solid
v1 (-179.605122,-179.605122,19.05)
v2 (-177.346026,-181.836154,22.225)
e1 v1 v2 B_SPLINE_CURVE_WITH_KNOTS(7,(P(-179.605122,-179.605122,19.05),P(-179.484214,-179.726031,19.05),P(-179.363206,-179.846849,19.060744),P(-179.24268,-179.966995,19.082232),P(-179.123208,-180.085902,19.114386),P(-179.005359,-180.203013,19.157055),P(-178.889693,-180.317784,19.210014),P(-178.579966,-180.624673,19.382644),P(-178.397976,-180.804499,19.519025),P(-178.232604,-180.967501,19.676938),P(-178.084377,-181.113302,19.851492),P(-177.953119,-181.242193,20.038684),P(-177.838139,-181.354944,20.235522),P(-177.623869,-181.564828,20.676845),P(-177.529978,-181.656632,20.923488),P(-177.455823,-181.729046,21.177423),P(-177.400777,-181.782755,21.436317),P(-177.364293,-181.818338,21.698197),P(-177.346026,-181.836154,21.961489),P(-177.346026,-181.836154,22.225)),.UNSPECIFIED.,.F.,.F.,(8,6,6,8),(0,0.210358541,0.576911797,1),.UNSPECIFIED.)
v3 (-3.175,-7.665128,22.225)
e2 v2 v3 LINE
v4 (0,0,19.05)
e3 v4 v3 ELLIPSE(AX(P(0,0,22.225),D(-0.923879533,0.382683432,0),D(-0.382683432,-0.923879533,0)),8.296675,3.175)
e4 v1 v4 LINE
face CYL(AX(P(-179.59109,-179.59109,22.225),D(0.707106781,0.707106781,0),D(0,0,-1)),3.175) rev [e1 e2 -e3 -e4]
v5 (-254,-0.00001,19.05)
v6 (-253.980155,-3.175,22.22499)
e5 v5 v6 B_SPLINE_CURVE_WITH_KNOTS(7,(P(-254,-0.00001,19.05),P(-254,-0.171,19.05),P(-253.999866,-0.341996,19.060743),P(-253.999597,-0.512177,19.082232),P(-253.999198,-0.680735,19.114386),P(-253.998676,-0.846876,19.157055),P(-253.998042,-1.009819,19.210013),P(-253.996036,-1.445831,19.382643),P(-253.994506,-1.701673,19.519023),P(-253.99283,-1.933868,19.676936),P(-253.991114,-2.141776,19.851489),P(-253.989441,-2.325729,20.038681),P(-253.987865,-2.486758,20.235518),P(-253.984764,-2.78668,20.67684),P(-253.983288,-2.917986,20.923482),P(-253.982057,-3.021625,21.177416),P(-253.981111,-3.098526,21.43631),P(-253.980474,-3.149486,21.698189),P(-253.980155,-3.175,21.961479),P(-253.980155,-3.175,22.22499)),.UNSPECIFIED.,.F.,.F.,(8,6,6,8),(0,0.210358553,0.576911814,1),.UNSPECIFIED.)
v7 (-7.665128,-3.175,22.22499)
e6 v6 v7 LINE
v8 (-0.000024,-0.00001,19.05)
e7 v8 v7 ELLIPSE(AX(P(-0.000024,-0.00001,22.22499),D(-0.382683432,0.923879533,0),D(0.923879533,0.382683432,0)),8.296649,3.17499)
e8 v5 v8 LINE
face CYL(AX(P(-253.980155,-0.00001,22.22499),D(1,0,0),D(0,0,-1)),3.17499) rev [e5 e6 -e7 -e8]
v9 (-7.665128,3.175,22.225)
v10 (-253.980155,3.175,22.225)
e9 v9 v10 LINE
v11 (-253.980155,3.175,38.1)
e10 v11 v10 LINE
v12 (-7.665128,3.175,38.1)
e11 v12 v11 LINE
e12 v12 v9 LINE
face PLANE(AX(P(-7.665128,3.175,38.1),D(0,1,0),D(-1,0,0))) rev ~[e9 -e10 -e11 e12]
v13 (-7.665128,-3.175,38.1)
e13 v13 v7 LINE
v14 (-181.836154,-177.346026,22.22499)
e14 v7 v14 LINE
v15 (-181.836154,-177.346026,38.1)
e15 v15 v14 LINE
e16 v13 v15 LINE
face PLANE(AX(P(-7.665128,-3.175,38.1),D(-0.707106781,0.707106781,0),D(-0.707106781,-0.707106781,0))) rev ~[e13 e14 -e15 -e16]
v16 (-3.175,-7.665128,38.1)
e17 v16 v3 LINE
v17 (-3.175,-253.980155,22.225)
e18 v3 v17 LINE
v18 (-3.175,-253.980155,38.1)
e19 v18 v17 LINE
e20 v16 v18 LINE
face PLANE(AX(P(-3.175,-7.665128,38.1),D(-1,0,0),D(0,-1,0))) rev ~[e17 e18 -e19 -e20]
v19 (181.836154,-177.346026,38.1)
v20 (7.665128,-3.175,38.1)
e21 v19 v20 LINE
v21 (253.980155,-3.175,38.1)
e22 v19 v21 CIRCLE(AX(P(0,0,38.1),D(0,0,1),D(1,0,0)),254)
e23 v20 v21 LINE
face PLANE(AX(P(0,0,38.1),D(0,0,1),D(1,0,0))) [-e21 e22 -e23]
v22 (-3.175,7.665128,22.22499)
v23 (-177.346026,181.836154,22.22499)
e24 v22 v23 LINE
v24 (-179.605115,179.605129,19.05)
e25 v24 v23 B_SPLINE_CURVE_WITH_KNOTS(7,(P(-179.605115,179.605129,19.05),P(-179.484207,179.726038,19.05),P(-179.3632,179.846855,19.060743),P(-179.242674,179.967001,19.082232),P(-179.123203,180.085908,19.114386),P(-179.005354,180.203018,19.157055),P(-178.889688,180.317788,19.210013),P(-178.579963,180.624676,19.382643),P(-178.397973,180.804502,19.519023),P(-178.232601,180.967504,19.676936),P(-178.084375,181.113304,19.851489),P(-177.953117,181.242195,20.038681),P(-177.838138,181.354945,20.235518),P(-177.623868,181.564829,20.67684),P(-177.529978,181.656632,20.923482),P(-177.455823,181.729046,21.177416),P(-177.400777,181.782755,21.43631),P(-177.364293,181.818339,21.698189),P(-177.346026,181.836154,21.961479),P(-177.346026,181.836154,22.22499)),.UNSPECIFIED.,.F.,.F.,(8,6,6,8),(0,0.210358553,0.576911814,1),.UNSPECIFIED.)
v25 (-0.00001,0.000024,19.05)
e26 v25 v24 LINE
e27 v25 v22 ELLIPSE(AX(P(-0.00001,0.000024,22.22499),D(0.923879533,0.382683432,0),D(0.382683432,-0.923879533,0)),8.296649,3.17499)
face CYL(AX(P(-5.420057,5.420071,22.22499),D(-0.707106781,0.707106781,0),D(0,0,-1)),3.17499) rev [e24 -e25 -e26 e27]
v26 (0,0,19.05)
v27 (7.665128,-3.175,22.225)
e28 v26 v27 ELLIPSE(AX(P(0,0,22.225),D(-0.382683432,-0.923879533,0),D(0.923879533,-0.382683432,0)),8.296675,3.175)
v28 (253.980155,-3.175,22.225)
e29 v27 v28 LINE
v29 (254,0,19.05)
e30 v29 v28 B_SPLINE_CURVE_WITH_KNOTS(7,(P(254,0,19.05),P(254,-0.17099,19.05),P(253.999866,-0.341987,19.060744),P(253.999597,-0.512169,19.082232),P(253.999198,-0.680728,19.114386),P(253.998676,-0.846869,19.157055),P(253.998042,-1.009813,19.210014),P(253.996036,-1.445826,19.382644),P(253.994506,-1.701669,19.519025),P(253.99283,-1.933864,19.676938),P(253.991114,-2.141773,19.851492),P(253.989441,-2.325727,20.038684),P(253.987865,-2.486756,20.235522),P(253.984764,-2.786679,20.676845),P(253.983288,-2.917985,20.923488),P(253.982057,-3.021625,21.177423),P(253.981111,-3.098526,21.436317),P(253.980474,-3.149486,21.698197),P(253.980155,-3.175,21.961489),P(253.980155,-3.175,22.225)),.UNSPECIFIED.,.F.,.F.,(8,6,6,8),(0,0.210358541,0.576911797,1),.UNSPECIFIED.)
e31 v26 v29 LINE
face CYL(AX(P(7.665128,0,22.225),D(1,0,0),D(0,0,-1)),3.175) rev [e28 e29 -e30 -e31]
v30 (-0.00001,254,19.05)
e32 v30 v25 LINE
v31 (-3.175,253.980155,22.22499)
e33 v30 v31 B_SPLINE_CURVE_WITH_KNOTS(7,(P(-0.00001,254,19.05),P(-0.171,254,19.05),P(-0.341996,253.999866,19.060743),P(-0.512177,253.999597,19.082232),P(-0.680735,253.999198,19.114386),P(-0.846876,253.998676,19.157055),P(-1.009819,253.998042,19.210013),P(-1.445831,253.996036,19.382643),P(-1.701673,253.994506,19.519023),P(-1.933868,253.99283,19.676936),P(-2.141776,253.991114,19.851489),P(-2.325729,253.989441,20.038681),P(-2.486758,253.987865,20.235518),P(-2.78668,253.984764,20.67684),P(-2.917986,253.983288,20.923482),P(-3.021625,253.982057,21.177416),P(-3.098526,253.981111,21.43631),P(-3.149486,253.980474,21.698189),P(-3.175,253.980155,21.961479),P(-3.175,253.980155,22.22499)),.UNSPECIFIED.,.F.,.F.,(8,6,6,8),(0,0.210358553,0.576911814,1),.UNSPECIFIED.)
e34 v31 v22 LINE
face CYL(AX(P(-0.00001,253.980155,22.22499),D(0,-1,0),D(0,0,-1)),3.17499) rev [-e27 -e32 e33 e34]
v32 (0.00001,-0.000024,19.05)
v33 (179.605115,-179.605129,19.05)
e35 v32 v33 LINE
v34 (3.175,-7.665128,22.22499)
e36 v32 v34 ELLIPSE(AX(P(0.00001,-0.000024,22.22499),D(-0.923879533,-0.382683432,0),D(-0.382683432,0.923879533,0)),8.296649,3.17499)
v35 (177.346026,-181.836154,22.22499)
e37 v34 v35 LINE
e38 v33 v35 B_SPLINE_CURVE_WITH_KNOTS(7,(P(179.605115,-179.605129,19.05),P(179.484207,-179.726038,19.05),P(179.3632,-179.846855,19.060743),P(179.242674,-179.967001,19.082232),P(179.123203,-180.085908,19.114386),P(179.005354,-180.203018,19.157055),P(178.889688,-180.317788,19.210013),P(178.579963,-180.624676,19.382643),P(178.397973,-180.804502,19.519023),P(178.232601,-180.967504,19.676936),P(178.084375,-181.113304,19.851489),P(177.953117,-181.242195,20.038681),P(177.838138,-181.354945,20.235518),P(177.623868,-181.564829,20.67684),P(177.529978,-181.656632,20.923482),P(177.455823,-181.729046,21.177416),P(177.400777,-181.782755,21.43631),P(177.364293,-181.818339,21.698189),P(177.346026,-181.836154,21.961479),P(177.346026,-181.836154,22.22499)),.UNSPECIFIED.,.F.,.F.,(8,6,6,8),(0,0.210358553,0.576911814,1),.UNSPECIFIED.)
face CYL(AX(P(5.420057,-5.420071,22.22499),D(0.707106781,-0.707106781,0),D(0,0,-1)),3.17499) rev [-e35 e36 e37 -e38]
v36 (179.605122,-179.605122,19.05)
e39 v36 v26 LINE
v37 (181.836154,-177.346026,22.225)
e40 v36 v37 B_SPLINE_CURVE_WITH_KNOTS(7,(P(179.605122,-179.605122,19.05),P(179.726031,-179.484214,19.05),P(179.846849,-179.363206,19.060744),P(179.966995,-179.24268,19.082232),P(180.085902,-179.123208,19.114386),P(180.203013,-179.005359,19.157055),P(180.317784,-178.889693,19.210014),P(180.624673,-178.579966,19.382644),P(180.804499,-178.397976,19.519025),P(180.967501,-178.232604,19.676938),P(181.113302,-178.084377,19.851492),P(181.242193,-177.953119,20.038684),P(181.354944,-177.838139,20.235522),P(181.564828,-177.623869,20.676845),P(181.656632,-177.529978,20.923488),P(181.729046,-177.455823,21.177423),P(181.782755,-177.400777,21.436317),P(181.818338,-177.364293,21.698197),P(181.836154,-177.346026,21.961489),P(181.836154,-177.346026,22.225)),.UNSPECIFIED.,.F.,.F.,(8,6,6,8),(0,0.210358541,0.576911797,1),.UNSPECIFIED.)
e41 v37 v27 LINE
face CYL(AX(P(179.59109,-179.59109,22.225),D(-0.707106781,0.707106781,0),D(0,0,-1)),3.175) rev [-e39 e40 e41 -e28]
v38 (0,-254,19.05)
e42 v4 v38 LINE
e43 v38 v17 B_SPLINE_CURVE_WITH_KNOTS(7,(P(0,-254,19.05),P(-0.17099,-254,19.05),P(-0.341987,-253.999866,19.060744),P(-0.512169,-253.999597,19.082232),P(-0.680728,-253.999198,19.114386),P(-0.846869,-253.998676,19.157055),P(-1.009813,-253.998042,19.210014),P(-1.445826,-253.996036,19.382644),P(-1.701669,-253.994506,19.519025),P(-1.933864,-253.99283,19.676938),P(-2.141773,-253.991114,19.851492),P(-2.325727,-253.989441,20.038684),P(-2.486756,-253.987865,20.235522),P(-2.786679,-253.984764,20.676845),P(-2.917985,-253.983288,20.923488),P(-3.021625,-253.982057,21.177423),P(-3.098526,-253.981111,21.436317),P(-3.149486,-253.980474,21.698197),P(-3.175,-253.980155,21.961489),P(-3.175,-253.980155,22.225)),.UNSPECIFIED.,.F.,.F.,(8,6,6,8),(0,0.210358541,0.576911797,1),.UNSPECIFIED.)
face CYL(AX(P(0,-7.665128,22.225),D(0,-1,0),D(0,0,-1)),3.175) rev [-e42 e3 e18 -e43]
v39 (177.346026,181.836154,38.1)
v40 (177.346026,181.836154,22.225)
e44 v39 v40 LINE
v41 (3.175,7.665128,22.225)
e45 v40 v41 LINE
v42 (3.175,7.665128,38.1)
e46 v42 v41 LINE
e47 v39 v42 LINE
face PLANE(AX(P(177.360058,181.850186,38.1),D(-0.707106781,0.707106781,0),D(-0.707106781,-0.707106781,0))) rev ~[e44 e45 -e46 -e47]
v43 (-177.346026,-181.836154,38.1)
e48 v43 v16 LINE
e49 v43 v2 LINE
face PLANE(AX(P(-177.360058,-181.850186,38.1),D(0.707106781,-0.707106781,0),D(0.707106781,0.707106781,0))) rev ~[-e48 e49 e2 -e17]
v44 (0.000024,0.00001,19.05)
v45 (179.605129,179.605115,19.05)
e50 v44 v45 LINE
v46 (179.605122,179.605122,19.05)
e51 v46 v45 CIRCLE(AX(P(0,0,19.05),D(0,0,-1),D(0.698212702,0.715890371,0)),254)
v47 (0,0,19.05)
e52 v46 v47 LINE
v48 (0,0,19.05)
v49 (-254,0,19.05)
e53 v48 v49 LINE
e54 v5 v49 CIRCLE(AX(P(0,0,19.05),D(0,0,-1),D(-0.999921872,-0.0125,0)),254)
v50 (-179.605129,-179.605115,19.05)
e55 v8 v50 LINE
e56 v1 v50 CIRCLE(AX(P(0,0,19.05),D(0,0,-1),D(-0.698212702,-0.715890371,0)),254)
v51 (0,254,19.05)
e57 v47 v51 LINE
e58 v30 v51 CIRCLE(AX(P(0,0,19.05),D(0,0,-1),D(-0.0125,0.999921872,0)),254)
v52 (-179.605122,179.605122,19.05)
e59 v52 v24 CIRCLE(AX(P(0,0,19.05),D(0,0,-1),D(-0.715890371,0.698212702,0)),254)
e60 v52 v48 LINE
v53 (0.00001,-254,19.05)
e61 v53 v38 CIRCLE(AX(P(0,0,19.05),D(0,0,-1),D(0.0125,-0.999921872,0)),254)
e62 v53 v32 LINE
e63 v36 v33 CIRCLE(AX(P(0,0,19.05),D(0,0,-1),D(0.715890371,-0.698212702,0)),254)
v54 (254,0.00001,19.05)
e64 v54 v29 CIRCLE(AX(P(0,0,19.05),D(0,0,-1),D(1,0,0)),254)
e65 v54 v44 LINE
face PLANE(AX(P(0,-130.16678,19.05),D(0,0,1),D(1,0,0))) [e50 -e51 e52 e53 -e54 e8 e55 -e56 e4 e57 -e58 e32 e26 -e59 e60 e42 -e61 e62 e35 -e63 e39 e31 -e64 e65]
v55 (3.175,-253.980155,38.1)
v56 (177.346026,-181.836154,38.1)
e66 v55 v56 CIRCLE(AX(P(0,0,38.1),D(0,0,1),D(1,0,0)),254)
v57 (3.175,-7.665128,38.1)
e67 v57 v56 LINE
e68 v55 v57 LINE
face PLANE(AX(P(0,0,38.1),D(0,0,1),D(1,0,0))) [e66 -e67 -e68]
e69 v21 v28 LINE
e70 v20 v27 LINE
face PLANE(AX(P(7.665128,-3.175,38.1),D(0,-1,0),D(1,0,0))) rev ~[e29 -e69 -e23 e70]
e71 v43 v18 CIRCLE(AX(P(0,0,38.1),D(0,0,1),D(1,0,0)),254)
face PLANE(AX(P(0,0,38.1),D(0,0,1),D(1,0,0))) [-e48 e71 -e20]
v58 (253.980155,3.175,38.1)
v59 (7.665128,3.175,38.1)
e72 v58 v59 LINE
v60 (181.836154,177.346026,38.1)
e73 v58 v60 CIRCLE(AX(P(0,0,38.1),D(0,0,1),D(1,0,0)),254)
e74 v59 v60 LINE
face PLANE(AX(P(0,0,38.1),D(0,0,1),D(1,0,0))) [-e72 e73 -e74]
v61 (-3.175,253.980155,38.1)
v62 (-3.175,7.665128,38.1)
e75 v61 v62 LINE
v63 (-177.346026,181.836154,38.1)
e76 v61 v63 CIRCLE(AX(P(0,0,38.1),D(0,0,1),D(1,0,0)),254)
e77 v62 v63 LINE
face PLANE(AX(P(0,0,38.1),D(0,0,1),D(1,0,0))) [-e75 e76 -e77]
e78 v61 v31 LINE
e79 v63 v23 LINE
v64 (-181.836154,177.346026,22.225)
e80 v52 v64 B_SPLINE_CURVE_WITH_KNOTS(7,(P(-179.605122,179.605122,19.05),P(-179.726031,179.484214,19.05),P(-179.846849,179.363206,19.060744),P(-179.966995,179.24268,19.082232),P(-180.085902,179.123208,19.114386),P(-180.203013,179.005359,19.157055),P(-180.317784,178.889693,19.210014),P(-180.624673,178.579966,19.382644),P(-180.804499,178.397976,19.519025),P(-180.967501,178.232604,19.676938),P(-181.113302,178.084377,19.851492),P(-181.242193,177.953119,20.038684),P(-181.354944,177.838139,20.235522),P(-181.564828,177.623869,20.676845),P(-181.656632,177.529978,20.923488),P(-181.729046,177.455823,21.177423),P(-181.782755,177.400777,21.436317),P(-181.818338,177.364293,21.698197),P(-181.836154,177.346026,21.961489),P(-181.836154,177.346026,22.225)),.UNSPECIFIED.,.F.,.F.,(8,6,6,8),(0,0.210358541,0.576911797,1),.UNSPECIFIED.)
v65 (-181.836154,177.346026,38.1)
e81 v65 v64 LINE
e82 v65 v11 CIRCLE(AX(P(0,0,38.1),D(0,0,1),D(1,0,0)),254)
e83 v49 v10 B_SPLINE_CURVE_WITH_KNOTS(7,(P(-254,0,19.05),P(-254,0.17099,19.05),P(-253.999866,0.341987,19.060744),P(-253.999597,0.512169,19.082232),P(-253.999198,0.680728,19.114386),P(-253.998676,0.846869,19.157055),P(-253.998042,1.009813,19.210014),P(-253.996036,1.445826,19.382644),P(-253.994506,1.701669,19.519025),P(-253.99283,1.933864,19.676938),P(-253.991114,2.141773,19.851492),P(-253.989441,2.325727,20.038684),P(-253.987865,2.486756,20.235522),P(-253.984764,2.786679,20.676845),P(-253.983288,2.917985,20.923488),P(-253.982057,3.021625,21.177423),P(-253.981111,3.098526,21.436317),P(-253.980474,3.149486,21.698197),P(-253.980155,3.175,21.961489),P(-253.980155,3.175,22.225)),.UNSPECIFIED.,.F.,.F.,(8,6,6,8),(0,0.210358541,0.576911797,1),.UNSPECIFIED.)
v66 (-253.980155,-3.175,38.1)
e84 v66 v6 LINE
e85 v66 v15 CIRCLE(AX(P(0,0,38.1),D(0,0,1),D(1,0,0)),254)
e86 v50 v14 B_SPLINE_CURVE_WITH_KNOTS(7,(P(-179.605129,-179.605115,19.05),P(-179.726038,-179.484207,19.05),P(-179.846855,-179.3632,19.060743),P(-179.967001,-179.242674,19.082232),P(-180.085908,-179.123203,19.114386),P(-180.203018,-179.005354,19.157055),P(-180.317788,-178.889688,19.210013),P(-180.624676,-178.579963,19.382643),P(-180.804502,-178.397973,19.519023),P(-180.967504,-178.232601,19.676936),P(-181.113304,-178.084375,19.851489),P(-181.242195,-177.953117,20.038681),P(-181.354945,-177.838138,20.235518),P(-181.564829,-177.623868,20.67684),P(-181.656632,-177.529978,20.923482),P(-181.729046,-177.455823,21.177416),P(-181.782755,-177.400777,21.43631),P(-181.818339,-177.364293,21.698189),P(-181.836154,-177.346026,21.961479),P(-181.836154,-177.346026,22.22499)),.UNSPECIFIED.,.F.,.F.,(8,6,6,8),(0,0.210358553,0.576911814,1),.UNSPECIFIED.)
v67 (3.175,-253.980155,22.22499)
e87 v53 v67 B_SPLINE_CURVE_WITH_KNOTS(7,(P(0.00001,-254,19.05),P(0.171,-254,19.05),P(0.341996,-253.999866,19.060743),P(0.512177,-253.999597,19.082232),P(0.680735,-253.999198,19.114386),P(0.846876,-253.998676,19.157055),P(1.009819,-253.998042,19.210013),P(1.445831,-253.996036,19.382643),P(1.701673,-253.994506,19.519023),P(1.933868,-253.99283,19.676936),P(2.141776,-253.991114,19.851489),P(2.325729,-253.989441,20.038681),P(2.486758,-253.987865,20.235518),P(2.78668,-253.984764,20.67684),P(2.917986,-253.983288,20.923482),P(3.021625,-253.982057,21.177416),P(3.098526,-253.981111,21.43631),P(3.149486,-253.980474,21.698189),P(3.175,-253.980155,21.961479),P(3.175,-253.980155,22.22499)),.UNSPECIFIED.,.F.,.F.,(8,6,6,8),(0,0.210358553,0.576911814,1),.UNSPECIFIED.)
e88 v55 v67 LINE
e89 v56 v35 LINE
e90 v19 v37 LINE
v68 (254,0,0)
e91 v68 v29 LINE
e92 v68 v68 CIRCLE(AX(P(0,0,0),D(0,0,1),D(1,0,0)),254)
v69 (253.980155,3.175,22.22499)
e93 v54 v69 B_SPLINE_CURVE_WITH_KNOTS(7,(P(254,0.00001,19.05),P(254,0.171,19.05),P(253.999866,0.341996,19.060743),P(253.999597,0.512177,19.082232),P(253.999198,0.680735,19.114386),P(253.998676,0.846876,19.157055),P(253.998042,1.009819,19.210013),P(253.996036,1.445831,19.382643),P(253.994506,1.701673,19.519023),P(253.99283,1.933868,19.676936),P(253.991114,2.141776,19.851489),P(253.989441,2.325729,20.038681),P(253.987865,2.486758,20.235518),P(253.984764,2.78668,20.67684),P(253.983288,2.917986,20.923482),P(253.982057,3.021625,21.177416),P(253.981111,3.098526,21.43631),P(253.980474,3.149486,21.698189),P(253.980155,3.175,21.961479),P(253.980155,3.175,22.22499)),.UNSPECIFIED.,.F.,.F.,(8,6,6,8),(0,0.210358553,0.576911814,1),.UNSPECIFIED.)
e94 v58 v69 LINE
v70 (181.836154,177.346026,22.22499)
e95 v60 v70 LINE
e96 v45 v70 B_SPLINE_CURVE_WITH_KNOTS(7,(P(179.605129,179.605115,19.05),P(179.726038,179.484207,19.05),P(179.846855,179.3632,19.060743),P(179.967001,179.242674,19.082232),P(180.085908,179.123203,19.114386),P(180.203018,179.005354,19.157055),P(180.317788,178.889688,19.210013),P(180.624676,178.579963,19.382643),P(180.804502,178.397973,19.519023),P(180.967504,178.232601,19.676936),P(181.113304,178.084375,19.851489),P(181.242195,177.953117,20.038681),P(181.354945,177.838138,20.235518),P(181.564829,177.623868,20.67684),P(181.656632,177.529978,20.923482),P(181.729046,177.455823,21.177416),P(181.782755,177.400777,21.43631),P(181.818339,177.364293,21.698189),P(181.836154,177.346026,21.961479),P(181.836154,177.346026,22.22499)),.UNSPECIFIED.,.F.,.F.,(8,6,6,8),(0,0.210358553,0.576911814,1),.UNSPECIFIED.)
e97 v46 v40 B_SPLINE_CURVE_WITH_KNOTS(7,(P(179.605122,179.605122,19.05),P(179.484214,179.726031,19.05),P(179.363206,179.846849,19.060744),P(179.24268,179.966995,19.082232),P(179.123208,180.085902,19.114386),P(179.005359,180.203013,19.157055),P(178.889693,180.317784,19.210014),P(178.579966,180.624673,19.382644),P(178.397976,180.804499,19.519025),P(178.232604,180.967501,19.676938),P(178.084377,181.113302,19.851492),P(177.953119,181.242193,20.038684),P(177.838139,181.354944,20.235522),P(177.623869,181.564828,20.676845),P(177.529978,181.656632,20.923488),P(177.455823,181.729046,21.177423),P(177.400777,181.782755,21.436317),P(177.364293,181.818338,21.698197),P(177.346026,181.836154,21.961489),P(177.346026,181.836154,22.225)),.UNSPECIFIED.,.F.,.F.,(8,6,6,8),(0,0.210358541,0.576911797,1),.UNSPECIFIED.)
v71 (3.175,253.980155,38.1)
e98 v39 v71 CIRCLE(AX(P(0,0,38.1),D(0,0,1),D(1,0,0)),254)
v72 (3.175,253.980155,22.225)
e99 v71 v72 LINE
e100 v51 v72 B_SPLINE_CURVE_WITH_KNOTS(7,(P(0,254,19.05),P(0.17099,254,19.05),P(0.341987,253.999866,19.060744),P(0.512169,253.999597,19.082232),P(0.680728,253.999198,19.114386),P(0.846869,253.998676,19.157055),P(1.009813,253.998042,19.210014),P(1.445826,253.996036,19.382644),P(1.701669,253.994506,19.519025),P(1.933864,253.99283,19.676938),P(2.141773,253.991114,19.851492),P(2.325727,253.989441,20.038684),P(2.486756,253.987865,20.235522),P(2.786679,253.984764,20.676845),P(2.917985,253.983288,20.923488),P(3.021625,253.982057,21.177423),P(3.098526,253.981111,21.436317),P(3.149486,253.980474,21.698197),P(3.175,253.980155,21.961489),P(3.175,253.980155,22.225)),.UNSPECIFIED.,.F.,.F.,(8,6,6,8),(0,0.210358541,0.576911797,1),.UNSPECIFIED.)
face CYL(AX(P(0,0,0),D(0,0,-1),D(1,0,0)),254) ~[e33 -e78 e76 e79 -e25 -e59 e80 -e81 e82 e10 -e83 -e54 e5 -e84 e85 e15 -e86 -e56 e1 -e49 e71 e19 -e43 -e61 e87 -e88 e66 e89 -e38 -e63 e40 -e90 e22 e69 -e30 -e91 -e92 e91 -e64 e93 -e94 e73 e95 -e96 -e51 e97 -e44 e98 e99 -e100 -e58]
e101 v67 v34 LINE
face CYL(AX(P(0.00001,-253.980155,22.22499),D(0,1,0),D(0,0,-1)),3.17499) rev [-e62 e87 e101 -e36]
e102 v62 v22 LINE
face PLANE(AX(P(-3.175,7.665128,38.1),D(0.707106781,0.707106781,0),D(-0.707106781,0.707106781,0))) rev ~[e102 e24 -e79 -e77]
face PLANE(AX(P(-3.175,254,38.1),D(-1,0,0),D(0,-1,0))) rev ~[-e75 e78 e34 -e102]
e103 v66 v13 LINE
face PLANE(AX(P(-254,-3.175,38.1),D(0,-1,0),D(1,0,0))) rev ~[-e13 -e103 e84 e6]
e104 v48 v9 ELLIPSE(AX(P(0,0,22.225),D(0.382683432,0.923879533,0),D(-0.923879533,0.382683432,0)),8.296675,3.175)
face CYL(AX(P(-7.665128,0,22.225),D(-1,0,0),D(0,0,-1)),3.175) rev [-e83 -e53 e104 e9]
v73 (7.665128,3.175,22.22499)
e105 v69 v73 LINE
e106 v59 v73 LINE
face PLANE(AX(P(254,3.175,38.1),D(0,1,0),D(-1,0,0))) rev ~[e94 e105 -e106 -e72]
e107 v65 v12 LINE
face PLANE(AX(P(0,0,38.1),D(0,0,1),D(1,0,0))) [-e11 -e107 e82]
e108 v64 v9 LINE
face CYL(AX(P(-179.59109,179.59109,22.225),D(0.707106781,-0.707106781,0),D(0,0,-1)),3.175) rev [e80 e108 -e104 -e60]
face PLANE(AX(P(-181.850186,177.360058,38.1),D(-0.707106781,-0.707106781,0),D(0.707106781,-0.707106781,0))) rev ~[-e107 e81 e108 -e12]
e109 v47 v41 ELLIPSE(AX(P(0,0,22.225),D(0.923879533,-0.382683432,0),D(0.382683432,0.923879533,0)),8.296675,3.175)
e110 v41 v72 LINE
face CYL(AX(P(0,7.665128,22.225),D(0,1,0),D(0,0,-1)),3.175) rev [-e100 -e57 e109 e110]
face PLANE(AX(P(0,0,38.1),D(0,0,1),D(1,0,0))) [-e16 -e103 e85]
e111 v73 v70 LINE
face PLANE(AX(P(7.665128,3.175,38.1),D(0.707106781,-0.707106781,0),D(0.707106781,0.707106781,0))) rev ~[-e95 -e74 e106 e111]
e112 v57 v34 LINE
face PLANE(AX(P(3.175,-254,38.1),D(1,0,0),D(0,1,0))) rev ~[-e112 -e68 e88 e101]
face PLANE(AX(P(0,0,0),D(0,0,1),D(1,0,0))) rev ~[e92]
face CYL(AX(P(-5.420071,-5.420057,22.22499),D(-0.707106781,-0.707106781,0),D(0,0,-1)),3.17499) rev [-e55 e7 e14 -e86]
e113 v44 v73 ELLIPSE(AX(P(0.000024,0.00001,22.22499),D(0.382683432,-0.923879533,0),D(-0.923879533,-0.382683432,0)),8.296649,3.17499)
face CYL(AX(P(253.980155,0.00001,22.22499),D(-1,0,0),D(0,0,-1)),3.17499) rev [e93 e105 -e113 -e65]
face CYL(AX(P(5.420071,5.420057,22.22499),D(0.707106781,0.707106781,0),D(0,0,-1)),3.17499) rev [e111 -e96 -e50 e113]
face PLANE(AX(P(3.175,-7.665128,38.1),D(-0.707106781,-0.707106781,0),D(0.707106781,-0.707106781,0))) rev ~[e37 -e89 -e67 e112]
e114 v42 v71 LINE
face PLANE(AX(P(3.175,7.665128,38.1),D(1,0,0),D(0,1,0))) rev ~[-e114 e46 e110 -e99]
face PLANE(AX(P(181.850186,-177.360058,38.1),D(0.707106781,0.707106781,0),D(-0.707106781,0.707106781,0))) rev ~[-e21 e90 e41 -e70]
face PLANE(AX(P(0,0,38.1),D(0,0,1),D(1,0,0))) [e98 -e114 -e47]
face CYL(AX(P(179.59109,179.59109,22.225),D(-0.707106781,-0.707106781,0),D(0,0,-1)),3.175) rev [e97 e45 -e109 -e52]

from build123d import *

# Parameters (mm, degrees)
F0_R     = 254
F1_DEPTH = 38.1
F3_DEPTH = 19.05
F4_DEPTH = 19.05
F5_R     = 3.175
F5_R_2   = 3.17499


# Not quite as in the source:
# - a fillet or chamfer is up to 0.001 mm smaller than in the source, because OpenCascade refuses the exact size


with BuildPart() as f1:
    # F0 (on Top) → F1 (new body)
    with BuildSketch(Plane.XY):
        Circle(F0_R)
    extrude(amount=F1_DEPTH)

    # F2 (on face) → F3 (cut)
    with BuildSketch(Plane.XY.offset(38.1)):
        Polygon((-3.175, -7.6651280605), (-3.175, -254), (3.175, -254), (3.175, -7.6651280605), (0, -4.4901280605), align=None)
        Polygon((-177.3600583911, -181.8501864516), (-3.175, -7.6651280605), (-3.175, -3.175), (-7.6651280605, -3.175), (-181.8501864517, -177.3600583911), align=None)
        Polygon((-3.175, -3.175), (-3.175, -7.6651280605), (0, -4.4901280605), (-1.3151280605, -3.175), align=None)
        Polygon((0, -4.4901280605), (3.175, -7.6651280605), (3.175, -3.175), (1.3151280605, -3.175), align=None)
        Polygon((3.175, -3.175), (3.175, -7.6651280605), (177.3600583911, -181.8501864517), (181.8501864517, -177.3600583911), (7.6651280605, -3.175), align=None)
        Polygon((-7.6651280605, -3.175), (-3.175, -3.175), (-3.175, -1.3151280605), (-4.4901280605, 0), align=None)
        Polygon((3.175, -1.3151280605), (3.175, -3.175), (7.6651280605, -3.175), (4.4901280605, 0), align=None)
        Polygon((-254, -3.175), (-7.6651280605, -3.175), (-4.4901280605, 0), (-7.6651280605, 3.175), (-254, 3.175), align=None)
        Polygon((4.4901280605, 0), (7.6651280605, -3.175), (254, -3.175), (254, 3.175), (7.6651280605, 3.175), align=None)
        Polygon((-4.4901280605, 0), (-3.175, 1.3151280605), (-3.175, 3.175), (-7.6651280605, 3.175), align=None)
        Polygon((3.175, 3.175), (3.175, 1.3151280605), (4.4901280605, 0), (7.6651280605, 3.175), align=None)
        Polygon((-7.6651280605, 3.175), (-3.175, 3.175), (-3.175, 7.6651280605), (-177.3600583911, 181.8501864517), (-181.8501864517, 177.3600583911), align=None)
        Polygon((-3.175, 7.6651280605), (-3.175, 3.175), (-1.3151280605, 3.175), (0, 4.4901280605), align=None)
        Polygon((1.3151280605, 3.175), (3.175, 3.175), (3.175, 7.6651280605), (0, 4.4901280605), align=None)
        Polygon((3.175, 7.6651280605), (3.175, 3.175), (7.6651280605, 3.175), (181.8501864517, 177.3600583911), (177.3600583911, 181.8501864517), align=None)
        Polygon((-3.175, 254), (-3.175, 7.6651280605), (0, 4.4901280605), (3.175, 7.6651280605), (3.175, 254), align=None)
    extrude(amount=-F3_DEPTH, mode=Mode.SUBTRACT)

    # F4 (cut, through all): a face of the model
    f4_faces = [f1.faces().sort_by_distance(p)[0] for p in [
        (0, 0, 38.1),
    ]]
    extrude(f4_faces, amount=-F4_DEPTH, mode=Mode.SUBTRACT)

    # F5 (call 1 of 8: OpenCascade refuses the feature's edges together)
    f5_edges = [f1.edges().sort_by_distance(p)[0] for p in [
        (3.175, 130.822642, 19.05),
        (90.260513, 94.750641, 19.05),
    ]]
    fillet(f5_edges, radius=F5_R)

    # F5#2 (call 2 of 8) (radius 3.175 in the source; OpenCascade refuses exactly that, so slightly less here)
    f5_2_edges = [f1.edges().sort_by_distance(p)[0] for p in [
        (-3.175, 130.822642, 19.05),
        (-90.260513, 94.750641, 19.05),
    ]]
    fillet(f5_2_edges, radius=F5_R_2)

    # F5#3 (call 3 of 8)
    f5_3_edges = [f1.edges().sort_by_distance(p)[0] for p in [
        (-130.822642, 3.175, 19.05),
        (-94.750641, 90.260513, 19.05),
    ]]
    fillet(f5_3_edges, radius=F5_R)

    # F5#4 (call 4 of 8)
    f5_4_edges = [f1.edges().sort_by_distance(p)[0] for p in [
        (-3.175, -130.822642, 19.05),
        (-90.260513, -94.750641, 19.05),
    ]]
    fillet(f5_4_edges, radius=F5_R)

    # F5#5 (call 5 of 8) (radius 3.175 in the source; OpenCascade refuses exactly that, so slightly less here)
    f5_5_edges = [f1.edges().sort_by_distance(p)[0] for p in [
        (-130.822642, -3.175, 19.05),
        (-94.750641, -90.260513, 19.05),
    ]]
    fillet(f5_5_edges, radius=F5_R_2)

    # F5#6 (call 6 of 8) (radius 3.175 in the source; OpenCascade refuses exactly that, so slightly less here)
    f5_6_edges = [f1.edges().sort_by_distance(p)[0] for p in [
        (3.175, -130.822642, 19.05),
        (90.260513, -94.750641, 19.05),
    ]]
    fillet(f5_6_edges, radius=F5_R_2)

    # F5#7 (call 7 of 8)
    f5_7_edges = [f1.edges().sort_by_distance(p)[0] for p in [
        (130.822642, -3.175, 19.05),
        (94.750641, -90.260513, 19.05),
    ]]
    fillet(f5_7_edges, radius=F5_R)

    # F5#8 (call 8 of 8) (radius 3.175 in the source; OpenCascade refuses exactly that, so slightly less here)
    f5_8_edges = [f1.edges().sort_by_distance(p)[0] for p in [
        (130.822642, 3.175, 19.05),
        (94.750641, 90.260513, 19.05),
    ]]
    fillet(f5_8_edges, radius=F5_R_2)


solid = f1.part
